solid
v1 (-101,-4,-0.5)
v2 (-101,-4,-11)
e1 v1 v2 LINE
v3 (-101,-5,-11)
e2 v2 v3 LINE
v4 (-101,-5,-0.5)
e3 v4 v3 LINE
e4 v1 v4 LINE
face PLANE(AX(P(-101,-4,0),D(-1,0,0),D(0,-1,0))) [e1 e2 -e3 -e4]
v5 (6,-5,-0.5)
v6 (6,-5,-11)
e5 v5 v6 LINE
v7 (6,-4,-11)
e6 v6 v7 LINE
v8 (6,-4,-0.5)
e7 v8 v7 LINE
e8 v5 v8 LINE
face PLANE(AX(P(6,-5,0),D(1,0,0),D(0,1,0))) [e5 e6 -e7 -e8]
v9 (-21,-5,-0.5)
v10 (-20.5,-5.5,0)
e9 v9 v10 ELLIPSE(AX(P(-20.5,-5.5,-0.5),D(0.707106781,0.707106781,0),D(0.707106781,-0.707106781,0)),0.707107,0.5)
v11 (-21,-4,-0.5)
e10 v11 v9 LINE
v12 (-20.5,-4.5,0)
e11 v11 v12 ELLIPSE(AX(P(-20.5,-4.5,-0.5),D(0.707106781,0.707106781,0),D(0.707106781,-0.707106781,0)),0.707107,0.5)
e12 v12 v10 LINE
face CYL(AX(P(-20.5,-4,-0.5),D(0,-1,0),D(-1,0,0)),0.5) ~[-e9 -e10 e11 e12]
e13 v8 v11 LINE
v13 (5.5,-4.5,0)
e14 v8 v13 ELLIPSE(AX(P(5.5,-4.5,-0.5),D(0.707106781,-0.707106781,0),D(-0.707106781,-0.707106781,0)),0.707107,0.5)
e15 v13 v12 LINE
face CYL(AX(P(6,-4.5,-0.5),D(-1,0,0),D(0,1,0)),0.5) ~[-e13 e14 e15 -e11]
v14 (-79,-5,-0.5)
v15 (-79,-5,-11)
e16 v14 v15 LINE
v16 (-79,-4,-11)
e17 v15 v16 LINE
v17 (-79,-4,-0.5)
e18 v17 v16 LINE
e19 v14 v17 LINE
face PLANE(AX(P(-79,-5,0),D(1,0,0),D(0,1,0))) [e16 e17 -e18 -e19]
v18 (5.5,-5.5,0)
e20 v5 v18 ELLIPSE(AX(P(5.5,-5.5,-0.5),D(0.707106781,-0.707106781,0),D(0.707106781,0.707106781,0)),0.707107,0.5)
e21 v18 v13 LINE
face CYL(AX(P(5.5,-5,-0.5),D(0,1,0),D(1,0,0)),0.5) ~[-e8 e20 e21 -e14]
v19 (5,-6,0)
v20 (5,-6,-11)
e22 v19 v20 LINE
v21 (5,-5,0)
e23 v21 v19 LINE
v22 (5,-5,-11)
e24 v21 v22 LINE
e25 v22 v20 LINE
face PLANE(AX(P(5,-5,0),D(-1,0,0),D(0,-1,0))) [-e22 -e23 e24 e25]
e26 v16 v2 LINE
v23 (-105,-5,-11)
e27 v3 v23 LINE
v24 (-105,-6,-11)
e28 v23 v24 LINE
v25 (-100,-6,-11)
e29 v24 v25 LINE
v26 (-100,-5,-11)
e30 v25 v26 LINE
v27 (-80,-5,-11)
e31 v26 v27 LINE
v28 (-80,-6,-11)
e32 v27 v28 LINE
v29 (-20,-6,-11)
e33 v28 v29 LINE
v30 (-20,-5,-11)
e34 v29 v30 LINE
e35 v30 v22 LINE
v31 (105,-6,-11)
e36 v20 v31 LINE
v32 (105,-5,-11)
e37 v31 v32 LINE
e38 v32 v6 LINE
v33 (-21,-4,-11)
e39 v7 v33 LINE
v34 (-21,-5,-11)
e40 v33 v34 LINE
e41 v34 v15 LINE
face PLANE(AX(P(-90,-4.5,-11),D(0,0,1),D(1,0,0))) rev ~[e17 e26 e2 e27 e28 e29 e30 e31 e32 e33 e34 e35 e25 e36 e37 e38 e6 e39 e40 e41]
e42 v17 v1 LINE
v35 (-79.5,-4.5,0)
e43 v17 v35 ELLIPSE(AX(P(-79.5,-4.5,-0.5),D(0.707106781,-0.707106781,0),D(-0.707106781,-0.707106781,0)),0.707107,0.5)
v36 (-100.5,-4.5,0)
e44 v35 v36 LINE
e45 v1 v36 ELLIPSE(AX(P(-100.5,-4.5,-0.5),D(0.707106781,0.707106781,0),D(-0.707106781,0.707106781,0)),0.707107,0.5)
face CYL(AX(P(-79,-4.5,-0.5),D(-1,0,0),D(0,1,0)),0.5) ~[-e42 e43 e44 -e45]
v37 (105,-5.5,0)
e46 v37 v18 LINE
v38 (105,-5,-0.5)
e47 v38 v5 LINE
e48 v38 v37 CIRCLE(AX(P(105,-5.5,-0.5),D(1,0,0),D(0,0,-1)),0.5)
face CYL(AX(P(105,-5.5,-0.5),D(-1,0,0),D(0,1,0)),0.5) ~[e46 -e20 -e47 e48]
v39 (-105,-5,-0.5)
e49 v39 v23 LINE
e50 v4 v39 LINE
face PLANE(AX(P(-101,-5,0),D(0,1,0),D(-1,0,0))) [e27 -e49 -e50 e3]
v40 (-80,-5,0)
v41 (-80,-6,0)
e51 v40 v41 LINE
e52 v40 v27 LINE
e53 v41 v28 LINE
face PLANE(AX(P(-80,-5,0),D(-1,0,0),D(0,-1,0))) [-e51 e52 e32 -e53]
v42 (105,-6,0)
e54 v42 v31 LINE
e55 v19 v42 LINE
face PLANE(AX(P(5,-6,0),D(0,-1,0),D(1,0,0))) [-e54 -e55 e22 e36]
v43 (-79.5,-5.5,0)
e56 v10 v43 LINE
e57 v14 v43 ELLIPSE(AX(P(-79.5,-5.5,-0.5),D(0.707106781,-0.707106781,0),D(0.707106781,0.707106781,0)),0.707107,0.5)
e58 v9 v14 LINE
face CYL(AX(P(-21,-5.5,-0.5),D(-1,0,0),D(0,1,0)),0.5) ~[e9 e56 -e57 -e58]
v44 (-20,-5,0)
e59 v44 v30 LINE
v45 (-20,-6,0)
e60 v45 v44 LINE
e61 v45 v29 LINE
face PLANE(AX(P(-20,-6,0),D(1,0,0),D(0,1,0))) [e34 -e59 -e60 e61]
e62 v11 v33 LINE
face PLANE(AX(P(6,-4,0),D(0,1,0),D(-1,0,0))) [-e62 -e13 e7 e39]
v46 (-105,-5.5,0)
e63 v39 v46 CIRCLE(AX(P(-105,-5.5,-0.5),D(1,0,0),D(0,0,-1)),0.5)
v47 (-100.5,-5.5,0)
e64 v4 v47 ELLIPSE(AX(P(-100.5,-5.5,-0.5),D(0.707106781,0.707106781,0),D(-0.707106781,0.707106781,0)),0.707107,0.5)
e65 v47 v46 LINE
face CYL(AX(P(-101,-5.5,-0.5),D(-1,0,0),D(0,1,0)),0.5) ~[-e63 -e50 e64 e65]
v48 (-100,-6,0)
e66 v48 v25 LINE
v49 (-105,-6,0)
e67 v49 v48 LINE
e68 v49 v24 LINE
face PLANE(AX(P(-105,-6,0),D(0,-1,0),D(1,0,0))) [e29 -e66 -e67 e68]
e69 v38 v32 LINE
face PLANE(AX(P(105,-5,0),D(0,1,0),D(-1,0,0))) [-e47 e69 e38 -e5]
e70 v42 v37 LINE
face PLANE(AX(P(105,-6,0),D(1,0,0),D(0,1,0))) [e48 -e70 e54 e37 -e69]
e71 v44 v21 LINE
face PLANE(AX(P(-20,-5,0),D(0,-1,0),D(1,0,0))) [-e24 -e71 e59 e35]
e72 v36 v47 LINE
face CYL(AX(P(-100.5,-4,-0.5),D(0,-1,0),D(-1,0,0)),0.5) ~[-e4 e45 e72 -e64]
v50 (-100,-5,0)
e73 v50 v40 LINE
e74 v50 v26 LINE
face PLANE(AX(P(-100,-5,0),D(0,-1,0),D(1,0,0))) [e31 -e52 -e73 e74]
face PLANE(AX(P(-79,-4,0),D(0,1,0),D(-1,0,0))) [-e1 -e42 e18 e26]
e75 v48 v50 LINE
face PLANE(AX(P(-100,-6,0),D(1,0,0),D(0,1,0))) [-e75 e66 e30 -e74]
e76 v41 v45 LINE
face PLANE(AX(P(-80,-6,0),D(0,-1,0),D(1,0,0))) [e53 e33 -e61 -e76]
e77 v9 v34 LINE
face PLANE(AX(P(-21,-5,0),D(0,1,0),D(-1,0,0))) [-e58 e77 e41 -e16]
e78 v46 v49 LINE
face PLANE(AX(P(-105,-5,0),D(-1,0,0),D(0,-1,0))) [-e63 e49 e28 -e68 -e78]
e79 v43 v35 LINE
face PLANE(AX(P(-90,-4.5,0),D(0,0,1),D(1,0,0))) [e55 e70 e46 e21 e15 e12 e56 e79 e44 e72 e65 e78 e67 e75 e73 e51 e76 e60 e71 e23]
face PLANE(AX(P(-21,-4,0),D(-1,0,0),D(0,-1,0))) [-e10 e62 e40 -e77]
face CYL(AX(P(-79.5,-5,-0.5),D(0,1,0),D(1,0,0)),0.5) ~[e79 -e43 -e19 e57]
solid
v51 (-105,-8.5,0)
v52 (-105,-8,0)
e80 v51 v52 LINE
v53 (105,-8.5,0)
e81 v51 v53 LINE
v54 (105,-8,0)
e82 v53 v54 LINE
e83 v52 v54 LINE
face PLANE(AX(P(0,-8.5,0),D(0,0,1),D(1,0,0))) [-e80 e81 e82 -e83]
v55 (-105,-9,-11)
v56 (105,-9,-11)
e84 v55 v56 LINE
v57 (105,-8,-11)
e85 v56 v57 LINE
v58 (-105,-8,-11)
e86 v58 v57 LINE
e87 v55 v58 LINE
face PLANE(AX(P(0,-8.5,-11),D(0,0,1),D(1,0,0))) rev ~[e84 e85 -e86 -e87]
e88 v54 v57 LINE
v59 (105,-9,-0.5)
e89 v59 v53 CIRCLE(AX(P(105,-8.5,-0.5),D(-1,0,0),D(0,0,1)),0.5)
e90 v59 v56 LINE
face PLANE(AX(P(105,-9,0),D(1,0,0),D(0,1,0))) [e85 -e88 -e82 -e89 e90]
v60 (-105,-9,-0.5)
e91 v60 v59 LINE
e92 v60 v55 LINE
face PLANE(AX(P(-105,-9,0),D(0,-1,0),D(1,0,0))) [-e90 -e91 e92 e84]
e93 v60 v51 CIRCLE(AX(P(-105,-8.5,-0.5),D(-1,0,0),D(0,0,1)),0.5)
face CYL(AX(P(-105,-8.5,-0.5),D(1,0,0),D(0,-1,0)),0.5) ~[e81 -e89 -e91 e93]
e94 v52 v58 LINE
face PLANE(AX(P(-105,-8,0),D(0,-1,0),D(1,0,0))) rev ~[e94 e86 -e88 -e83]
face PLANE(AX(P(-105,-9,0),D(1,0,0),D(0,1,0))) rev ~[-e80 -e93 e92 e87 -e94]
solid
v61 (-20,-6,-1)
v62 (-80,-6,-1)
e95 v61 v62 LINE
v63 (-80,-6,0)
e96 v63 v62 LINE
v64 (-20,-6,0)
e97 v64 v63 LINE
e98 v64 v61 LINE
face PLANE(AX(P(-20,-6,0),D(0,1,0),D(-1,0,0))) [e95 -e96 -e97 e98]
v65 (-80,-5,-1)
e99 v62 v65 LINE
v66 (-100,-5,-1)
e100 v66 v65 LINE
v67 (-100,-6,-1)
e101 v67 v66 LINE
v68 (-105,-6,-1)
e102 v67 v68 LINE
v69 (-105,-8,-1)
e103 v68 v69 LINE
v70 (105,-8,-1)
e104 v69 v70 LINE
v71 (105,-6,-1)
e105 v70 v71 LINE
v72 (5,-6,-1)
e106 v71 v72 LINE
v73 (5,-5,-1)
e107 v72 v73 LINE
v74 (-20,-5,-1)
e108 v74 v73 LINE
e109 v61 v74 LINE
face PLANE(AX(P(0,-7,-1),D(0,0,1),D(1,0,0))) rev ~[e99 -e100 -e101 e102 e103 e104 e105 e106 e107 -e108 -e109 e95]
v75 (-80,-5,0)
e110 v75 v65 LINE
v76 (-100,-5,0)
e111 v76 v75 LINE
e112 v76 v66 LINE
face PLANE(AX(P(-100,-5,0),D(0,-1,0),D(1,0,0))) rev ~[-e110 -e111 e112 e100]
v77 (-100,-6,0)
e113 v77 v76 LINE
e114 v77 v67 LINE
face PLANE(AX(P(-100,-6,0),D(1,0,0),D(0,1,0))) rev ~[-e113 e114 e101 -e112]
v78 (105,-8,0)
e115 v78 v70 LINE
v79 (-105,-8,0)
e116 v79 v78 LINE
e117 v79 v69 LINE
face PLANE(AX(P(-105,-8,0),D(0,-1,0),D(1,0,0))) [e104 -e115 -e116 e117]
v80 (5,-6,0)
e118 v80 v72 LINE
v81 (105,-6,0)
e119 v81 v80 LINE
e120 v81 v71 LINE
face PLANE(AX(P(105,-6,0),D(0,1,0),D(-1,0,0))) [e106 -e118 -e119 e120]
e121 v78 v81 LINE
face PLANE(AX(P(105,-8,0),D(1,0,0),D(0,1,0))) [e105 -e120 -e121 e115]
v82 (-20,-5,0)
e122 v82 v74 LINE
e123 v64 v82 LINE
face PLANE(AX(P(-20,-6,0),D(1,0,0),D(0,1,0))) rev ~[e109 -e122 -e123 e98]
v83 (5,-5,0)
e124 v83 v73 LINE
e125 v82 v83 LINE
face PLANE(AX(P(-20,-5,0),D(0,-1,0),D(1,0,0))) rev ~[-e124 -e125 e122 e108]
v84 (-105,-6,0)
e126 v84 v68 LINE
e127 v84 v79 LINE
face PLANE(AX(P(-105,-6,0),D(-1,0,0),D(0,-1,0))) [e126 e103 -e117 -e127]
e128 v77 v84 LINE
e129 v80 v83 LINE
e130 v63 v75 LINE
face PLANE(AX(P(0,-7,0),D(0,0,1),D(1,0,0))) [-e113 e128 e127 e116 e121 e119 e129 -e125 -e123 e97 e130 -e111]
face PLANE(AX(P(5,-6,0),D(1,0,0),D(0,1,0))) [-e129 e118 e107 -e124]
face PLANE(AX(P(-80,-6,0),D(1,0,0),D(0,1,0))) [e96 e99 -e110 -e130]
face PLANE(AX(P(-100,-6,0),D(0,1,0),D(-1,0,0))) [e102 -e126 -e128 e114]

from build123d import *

# Parameters (mm, degrees)
F0_W     = 20
F0_H     = 1
F0_W_2   = 25
F1_DEPTH = 1
F2_DEPTH = 11
F0_W_3   = 210
F3_R     = 0.5
F3_2_R   = 0.5


with BuildPart() as f1:
    # F0 (on Top) → F1 (new body)
    with BuildSketch(Plane.XY):
        Polygon((-100, -6), (-105, -6), (-105, -8), (105, -8), (105, -6), (5, -6), (-20, -6), (-80, -6), align=None)
        with Locations((-90, -5.5)):
            Rectangle(F0_W, F0_H)
        with Locations((-7.5, -5.5)):
            Rectangle(F0_W_2, F0_H)
    extrude(amount=-F1_DEPTH)


with BuildPart() as f2:
    # F0 (on Top) → F2 (new body)
    with BuildSketch(Plane.XY):
        Polygon((-101, -4), (-101, -5), (-100, -5), (-80, -5), (-79, -5), (-79, -4), align=None)
        Polygon((-101, -5), (-105, -5), (-105, -6), (-100, -6), (-100, -5), align=None)
        Polygon((-79, -5), (-80, -5), (-80, -6), (-20, -6), (-20, -5), (-21, -5), align=None)
        Polygon((-21, -4), (-21, -5), (-20, -5), (5, -5), (6, -5), (6, -4), align=None)
        Polygon((5, -6), (105, -6), (105, -5), (6, -5), (5, -5), align=None)
    extrude(amount=-F2_DEPTH)

    # F3
    f3_edges = [f2.edges().sort_by_distance(p)[0] for p in [
        (-103, -5, 0),
        (-21, -4.5, 0),
        (-7.5, -4, 0),
        (6, -4.5, 0),
        (55.5, -5, 0),
        (-90, -4, 0),
        (-79, -4.5, 0),
        (-101, -4.5, 0),
        (-50, -5, 0),
    ]]
    fillet(f3_edges, radius=F3_R)


with BuildPart() as f2b:
    # F0 (on Top) → F2, piece 2 (new body)
    with BuildSketch(Plane.XY):
        with Locations((0, -8.5)):
            Rectangle(F0_W_3, F0_H)
    extrude(amount=-F2_DEPTH)

    # F3#2
    f3_2_edges = [f2b.edges().sort_by_distance(p)[0] for p in [
        (0, -9, 0),
    ]]
    fillet(f3_2_edges, radius=F3_2_R)


solid = Compound([f1.part, f2.part, f2b.part])
